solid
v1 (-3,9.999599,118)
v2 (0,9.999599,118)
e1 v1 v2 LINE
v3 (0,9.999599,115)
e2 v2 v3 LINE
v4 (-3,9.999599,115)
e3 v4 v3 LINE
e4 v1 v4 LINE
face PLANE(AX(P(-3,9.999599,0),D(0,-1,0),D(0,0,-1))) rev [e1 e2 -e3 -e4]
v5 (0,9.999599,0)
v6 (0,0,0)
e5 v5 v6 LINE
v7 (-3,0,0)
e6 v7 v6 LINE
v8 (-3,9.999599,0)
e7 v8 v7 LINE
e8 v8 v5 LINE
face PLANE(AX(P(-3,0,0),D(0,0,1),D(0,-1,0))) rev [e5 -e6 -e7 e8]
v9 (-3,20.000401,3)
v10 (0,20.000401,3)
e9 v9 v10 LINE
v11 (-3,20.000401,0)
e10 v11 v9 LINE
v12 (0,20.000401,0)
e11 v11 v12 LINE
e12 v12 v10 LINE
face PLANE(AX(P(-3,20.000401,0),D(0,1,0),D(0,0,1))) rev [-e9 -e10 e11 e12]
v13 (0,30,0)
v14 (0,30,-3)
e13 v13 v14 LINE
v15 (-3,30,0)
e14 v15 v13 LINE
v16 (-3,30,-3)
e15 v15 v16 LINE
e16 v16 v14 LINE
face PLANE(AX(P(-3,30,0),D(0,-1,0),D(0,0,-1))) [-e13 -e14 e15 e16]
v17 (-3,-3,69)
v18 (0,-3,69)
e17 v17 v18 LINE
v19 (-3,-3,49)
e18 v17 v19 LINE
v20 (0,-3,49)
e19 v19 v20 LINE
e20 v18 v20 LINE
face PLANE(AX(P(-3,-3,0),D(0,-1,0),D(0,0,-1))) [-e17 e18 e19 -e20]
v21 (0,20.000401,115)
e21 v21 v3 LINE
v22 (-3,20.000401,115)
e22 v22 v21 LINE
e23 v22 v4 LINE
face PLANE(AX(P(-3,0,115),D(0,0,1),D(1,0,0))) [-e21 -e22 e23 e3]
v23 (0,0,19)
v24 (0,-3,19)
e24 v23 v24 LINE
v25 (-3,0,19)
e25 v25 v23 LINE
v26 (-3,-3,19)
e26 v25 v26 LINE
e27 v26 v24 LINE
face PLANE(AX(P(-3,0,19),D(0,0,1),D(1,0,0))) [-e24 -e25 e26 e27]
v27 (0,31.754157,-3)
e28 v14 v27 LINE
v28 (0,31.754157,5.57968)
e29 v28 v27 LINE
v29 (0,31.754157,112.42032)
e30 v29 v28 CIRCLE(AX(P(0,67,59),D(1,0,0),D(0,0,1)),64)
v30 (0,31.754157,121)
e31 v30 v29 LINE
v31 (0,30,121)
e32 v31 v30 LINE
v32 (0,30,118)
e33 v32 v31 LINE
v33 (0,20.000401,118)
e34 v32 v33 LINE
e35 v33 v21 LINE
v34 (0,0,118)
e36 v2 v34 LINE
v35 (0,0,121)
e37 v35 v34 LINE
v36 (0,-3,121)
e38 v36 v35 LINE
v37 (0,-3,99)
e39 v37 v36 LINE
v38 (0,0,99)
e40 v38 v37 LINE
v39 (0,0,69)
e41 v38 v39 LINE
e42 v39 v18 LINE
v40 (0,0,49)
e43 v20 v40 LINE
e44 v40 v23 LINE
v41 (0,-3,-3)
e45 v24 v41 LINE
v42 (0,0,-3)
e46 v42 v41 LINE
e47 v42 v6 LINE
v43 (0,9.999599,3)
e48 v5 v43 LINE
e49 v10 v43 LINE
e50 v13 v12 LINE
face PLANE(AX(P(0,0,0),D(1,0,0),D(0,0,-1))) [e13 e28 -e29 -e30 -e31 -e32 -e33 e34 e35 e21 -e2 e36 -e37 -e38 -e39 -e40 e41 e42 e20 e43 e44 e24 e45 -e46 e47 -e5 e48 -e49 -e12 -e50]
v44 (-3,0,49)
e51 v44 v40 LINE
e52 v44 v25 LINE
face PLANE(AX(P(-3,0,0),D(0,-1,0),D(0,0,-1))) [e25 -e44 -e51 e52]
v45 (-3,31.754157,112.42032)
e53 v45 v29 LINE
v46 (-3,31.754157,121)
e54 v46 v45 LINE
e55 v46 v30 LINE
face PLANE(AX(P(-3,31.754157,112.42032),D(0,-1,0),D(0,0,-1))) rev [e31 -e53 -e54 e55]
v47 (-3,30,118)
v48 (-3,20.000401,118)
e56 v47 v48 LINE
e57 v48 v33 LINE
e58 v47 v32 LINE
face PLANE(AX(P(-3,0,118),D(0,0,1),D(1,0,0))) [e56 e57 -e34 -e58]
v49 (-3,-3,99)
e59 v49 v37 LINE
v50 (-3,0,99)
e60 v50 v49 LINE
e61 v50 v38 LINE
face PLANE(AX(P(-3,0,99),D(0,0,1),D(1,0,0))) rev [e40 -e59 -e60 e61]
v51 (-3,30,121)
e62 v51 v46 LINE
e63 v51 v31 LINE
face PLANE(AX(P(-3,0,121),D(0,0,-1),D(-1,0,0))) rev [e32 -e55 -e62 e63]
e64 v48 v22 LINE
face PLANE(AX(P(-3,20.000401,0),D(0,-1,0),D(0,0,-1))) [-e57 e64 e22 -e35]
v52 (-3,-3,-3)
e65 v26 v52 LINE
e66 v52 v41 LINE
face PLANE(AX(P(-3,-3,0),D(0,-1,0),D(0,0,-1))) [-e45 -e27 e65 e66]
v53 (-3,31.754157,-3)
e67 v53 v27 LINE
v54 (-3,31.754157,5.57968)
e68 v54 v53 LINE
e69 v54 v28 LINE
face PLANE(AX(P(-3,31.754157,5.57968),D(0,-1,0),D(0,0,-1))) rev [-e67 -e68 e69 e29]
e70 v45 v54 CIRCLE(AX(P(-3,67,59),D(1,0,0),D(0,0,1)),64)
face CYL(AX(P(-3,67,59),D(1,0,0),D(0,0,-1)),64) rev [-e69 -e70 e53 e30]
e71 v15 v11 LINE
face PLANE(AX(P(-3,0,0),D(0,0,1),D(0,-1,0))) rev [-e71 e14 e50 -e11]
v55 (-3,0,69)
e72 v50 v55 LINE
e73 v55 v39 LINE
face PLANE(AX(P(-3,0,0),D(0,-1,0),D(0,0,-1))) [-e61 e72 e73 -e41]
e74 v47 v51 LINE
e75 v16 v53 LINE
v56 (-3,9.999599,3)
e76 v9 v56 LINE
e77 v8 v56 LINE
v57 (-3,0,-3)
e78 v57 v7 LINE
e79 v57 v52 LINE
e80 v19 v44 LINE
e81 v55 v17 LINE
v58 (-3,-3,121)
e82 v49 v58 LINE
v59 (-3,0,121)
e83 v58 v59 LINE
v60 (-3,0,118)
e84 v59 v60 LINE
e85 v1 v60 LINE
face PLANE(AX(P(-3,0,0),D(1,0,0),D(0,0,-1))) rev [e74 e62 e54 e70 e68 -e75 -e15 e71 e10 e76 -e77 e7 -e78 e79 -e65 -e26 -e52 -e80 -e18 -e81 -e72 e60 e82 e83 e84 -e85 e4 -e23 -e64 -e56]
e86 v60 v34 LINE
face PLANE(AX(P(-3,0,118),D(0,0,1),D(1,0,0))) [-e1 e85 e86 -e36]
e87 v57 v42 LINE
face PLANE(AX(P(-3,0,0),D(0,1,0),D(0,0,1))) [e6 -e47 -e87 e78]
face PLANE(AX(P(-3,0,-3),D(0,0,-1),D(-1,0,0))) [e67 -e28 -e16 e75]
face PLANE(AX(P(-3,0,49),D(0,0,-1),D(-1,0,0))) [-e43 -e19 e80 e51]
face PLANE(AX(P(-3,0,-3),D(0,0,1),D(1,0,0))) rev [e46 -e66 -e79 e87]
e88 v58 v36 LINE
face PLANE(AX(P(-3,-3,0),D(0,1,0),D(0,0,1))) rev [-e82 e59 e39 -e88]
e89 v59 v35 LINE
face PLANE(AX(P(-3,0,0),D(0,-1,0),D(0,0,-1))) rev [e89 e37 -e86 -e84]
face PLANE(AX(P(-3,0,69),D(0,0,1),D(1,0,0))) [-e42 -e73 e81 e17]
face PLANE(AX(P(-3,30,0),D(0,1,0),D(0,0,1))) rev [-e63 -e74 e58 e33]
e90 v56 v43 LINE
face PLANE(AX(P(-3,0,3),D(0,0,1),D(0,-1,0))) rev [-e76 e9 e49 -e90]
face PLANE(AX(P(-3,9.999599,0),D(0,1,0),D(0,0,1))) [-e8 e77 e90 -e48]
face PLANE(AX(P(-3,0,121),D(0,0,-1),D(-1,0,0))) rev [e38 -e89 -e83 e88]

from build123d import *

# Parameters (mm, degrees)
IMPORTED_START          = -3
IMPORTED_BODY_4_1_DEPTH = 3
CUT_EXTRUDE_2_DEPTH     = 3


# Read off the part's stored shape, not the designer's step: 基体零件-零件4-1
with BuildPart() as part:
    # 基体零件-零件4-1 outline → 基体零件-零件4-1 (new body)
    with BuildSketch(Plane.YZ.offset(IMPORTED_START)):
        Polygon((-3, -3), (0, -3), (0, 0), (9.999598957, 0), (9.999598957, 3), (20.000401043, 3), (20.000401043, 0), (30, 0), (30, -3), (52, -3), (52, 0), (82, 0), (82, -3), (104, -3), (104, 19), (101, 19), (101, 49), (104, 49), (104, 69), (101, 69), (101, 99), (104, 99), (104, 121), (82, 121), (82, 118), (52, 118), (52, 121), (30, 121), (30, 118), (20.000401043, 118), (20.000401043, 115), (9.999598957, 115), (9.999598957, 118), (0, 118), (0, 121), (-3, 121), (-3, 99), (0, 99), (0, 69), (-3, 69), (-3, 49), (0, 49), (0, 19), (-3, 19), align=None)
    extrude(amount=IMPORTED_BODY_4_1_DEPTH)

    # 草图3 → 切除-拉伸2 (cut)
    with BuildSketch(Plane(origin=(0, 0, 0), x_dir=(0, 0, -1), z_dir=(1, 0, 0))):
        with BuildLine():
            Line((-121, 104), (3, 104))
            Line((3, 104), (3, 31.75415679))
            Line((3, 31.75415679), (-5.579680491, 31.75415679))
            ThreePointArc((-5.579680491, 31.75415679), (-59, 3), (-112.420319509, 31.75415679))
            Line((-112.420319509, 31.75415679), (-121, 31.75415679))
            Line((-121, 31.75415679), (-121, 104))
        make_face()
    extrude(amount=-CUT_EXTRUDE_2_DEPTH, mode=Mode.SUBTRACT)


solid = part.part
